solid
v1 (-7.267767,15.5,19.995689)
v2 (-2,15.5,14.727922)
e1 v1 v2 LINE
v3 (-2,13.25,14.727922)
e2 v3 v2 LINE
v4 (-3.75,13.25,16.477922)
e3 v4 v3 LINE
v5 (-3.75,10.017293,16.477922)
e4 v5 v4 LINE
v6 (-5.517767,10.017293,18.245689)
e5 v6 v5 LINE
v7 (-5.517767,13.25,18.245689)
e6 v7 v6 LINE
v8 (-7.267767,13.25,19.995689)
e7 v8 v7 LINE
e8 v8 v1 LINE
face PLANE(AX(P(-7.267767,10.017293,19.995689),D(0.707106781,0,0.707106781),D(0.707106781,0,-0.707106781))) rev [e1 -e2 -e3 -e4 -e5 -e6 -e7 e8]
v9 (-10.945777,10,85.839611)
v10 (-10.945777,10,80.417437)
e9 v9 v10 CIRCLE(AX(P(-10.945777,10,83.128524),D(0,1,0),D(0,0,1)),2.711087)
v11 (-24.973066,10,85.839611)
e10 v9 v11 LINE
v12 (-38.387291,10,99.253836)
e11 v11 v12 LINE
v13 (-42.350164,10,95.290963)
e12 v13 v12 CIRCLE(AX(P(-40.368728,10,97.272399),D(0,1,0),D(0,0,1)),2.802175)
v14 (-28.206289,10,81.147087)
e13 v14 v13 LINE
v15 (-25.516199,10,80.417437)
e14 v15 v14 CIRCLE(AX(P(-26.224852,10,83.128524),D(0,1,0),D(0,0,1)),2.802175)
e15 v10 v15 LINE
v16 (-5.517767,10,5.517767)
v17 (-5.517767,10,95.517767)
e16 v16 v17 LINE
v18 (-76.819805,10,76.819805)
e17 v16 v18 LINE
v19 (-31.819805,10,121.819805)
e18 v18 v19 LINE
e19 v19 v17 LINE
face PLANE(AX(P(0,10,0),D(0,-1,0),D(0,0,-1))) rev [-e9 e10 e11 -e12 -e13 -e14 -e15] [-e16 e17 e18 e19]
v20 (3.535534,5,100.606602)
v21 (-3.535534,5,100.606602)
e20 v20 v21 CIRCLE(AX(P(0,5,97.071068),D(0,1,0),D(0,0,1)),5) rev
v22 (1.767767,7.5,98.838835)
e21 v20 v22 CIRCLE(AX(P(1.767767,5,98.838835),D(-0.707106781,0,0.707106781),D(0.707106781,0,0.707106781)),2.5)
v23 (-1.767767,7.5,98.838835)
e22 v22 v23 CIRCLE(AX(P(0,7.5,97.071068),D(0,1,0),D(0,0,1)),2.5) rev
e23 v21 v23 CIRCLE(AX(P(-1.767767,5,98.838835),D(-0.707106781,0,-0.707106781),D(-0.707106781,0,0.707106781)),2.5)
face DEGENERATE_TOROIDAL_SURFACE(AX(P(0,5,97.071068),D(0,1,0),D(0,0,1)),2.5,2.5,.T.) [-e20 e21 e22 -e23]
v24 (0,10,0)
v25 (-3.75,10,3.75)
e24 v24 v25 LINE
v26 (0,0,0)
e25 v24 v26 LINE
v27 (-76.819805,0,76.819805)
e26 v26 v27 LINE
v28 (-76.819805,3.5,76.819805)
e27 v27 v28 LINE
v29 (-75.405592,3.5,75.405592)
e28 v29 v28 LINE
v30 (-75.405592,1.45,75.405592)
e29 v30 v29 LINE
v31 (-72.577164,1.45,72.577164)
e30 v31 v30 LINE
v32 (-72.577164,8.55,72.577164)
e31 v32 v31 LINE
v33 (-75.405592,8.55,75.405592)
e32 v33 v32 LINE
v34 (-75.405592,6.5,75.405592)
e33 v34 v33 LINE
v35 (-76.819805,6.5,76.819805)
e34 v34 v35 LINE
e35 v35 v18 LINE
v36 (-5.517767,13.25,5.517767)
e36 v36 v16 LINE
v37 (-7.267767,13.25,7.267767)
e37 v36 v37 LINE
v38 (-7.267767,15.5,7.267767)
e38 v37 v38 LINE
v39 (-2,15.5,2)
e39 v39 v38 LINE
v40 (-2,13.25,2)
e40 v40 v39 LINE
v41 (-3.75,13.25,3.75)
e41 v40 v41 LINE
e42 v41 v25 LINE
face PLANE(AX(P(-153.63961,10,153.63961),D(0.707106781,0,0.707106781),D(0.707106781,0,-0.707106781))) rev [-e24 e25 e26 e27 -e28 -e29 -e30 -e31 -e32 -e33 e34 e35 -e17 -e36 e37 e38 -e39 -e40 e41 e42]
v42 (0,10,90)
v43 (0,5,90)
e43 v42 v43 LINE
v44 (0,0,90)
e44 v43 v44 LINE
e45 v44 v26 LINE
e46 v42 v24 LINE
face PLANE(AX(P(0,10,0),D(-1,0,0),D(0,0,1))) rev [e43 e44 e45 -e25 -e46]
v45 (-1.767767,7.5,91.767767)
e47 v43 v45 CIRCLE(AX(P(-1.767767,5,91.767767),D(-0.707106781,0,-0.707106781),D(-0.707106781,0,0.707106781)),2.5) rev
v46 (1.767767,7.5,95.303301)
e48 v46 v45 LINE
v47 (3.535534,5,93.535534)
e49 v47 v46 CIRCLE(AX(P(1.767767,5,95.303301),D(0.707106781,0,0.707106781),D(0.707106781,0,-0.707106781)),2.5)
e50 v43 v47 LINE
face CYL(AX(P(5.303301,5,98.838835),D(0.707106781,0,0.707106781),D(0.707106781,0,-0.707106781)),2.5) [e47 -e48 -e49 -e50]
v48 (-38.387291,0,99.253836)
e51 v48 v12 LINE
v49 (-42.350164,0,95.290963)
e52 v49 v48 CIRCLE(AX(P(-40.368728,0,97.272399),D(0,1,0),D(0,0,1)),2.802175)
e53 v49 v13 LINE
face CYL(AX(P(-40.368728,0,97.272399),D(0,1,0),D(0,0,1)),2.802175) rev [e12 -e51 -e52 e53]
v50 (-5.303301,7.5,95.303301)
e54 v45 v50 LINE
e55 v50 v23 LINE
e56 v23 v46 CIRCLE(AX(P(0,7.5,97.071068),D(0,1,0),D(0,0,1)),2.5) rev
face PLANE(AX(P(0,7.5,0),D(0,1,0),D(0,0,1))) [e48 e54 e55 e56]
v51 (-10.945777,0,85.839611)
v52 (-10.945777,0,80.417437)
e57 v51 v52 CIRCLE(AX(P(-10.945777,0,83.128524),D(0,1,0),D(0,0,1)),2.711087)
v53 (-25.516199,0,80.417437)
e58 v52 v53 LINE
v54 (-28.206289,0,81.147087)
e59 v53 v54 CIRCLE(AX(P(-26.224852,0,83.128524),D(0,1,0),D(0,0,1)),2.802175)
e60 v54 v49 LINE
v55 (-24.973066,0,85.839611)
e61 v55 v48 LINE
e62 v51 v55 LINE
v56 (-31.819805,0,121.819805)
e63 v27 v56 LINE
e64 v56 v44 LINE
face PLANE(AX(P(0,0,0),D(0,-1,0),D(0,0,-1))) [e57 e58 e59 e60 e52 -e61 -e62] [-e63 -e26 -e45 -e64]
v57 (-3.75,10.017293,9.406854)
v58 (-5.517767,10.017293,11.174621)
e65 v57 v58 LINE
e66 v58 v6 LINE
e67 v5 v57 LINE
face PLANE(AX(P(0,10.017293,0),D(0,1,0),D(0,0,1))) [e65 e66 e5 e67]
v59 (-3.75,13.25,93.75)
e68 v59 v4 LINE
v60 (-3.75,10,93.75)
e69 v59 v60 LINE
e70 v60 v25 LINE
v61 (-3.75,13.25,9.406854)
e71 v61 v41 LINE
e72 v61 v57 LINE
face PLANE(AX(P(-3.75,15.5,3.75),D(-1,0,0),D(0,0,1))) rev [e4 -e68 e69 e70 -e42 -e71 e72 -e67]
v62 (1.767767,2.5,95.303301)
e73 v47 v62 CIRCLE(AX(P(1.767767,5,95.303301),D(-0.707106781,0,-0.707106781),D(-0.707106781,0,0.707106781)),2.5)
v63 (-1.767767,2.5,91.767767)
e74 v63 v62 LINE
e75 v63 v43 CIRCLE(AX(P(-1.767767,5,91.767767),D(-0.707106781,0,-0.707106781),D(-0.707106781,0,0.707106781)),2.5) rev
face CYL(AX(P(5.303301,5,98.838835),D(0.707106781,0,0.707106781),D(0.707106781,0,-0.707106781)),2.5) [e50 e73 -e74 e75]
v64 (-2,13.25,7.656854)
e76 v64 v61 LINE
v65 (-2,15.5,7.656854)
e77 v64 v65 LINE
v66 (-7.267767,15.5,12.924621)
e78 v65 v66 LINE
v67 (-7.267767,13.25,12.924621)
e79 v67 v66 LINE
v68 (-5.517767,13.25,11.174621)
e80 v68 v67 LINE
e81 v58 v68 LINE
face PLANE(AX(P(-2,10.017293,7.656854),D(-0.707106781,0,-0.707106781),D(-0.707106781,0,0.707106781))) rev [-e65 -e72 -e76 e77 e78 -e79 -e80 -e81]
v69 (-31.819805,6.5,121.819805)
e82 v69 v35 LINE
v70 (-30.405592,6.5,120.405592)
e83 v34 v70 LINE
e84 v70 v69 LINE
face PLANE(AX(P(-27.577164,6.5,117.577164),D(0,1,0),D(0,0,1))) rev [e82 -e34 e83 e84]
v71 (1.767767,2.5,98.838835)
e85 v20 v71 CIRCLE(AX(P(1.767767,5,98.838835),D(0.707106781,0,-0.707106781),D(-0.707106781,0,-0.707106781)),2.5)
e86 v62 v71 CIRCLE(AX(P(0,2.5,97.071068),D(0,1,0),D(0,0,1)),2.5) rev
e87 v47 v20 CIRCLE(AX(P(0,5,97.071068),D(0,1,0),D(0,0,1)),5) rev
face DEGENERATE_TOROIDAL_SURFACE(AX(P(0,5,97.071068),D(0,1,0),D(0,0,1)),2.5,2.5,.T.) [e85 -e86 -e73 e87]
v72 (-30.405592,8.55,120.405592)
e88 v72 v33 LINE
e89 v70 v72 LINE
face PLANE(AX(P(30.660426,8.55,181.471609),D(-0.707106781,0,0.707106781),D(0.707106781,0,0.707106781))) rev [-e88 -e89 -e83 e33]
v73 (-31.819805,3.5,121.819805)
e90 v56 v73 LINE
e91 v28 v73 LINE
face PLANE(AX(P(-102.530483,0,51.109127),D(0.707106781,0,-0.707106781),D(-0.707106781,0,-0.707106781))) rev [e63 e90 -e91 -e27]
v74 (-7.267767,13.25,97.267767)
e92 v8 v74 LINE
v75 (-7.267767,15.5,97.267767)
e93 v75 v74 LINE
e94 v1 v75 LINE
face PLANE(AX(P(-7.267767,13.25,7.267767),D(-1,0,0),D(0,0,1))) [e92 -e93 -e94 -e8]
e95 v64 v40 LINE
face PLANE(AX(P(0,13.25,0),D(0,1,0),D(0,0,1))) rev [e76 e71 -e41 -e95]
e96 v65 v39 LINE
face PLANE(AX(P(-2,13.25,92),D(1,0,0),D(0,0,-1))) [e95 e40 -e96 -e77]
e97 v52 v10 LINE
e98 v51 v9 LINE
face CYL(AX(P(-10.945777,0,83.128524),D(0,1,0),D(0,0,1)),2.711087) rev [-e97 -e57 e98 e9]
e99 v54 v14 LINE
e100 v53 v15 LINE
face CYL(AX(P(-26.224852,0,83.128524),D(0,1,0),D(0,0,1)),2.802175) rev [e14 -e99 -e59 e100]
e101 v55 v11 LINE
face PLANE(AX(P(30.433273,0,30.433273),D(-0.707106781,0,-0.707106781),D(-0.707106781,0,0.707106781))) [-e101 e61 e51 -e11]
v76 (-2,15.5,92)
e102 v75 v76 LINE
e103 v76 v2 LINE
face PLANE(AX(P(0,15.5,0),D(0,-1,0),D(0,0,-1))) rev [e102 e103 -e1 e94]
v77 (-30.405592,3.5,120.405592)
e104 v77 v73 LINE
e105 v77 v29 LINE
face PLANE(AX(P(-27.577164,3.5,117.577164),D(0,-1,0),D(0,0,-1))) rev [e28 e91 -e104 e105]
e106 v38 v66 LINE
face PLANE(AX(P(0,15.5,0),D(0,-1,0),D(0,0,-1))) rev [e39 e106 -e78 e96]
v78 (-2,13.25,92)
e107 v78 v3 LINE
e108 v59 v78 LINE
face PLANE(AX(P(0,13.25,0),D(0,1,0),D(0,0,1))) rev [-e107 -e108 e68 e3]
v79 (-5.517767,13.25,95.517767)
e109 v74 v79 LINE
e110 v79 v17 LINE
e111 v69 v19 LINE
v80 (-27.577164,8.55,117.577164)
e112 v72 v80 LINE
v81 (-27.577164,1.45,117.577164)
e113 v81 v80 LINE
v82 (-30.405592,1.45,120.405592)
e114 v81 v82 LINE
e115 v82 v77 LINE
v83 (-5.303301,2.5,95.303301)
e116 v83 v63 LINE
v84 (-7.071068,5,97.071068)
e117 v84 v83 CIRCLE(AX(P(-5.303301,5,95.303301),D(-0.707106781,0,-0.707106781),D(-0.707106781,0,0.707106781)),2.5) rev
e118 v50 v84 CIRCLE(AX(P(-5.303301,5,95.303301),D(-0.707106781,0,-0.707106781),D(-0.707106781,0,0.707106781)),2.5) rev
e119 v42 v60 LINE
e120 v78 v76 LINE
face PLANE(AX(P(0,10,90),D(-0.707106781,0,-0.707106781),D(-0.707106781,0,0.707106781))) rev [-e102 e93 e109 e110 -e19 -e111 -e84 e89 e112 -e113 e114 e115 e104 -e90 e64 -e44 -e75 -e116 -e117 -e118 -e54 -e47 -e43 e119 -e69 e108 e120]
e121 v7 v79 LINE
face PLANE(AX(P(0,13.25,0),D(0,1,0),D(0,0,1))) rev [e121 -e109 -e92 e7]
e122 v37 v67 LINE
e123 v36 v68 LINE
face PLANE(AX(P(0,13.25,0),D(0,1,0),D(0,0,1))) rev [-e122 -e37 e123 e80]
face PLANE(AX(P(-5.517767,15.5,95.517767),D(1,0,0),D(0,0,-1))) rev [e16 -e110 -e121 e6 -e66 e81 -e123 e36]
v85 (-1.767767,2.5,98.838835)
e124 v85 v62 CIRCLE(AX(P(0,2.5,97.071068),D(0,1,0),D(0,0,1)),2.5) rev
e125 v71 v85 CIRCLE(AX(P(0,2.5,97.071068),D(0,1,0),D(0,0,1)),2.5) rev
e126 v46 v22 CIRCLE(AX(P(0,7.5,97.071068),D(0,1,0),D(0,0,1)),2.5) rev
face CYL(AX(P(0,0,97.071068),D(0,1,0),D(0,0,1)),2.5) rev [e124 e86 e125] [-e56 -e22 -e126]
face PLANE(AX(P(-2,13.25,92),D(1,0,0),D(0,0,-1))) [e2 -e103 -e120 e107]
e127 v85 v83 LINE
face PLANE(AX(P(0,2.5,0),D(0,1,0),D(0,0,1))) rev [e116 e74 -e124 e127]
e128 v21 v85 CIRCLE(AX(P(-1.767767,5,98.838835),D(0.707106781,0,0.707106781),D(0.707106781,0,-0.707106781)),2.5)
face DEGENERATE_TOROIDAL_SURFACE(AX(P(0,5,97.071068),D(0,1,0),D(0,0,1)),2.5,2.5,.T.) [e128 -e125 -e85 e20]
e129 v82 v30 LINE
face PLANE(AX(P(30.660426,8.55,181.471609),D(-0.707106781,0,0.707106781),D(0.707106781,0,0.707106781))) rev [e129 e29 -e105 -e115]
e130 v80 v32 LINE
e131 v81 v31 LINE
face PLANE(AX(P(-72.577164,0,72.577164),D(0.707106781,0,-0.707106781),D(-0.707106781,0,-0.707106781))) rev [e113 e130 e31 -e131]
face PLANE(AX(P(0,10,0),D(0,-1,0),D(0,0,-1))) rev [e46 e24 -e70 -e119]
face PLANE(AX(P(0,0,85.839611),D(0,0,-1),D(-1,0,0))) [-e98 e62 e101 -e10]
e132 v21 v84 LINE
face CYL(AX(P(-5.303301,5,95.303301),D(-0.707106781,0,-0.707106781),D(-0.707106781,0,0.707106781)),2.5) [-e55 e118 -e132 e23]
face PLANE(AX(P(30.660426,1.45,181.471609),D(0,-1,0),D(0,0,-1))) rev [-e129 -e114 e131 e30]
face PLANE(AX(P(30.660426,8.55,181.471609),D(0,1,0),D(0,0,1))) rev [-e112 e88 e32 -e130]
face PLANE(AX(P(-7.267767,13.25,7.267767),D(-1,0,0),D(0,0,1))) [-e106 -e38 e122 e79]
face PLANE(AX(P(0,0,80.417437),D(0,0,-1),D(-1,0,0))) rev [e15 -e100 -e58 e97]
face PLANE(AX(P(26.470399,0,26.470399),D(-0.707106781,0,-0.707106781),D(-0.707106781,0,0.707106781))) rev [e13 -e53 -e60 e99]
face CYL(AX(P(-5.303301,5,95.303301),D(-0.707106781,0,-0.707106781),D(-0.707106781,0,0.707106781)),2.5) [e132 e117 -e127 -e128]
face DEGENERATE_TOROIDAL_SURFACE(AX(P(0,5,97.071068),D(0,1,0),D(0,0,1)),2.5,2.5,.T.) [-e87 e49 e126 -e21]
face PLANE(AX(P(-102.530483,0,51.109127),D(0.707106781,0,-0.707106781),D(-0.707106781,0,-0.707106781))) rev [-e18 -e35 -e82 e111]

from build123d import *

# Parameters (mm, degrees)
BOSS_EXTRUDE1_DEPTH = 10
BOSS_EXTRUDE2_DEPTH = 5.5
BOSS_EXTRUDE4_DEPTH = 2.25
SKETCH5_W           = 167.071716414
SKETCH5_H           = 54.025930679
CUT_EXTRUDE1_DEPTH  = 100
BOSS_EXTRUDE5_DEPTH = 5.5
BOSS_EXTRUDE6_DEPTH = 2.25
CUT_EXTRUDE2_DEPTH  = 2.25
CUT_EXTRUDE3_DEPTH  = 5.5
CUT_EXTRUDE4_DEPTH  = 5.5
CUT_EXTRUDE5_DEPTH  = 5.5
CUT_EXTRUDE6_DEPTH  = 5.5
SKETCH14_W          = 63.639610307
SKETCH14_H          = 3
CUT_EXTRUDE7_DEPTH  = 6
SKETCH15_W          = 4
SKETCH15_H          = 7.1
CUT_EXTRUDE8_DEPTH  = 150
SKETCH16_W          = 18.586901627
SKETCH16_H          = 5.5
CUT_EXTRUDE9_DEPTH  = 34
SKETCH17_W          = 2.5
SKETCH17_H          = 5.5
CUT_EXTRUDE10_DEPTH = 34
SKETCH18_W          = 1.498020702
SKETCH18_H          = 5.5
CUT_EXTRUDE11_DEPTH = 34
SKETCH19_W          = 3.248020701
SKETCH19_H          = 2.25
CUT_EXTRUDE12_DEPTH = 34
BOSS_EXTRUDE7_DEPTH = 10
SKETCH21_R          = 2.5
CUT_EXTRUDE13_DEPTH = 10
FILLET1_R           = 5
FILLET2_R           = 5
CUT_EXTRUDE14_DEPTH = 2.5
CUT_EXTRUDE15_DEPTH = 2.5
FILLET6_R           = 2.5
FILLET7_R           = 2.5
CUT_EXTRUDE16_DEPTH = 10
CUT_EXTRUDE17_DEPTH = 5.482707377


with BuildPart() as part:
    # Sketch1 → Boss-Extrude1 (new body)
    with BuildSketch(Plane(origin=(0, 0, 0), x_dir=(1, 0, 0), z_dir=(0, 1, 0))):
        Polygon((0, 0), (0, -90), (-63.639610307, -153.639610307), (-153.639610307, -153.639610307), align=None)
    extrude(amount=BOSS_EXTRUDE1_DEPTH)

    # Sketch3 → Boss-Extrude2 (add)
    with BuildSketch(Plane(origin=(0, 10, 0), x_dir=(1, 0, 0), z_dir=(0, 1, 0))):
        Polygon((-3.75, -3.75), (-3.75, -93.75), (-5.517766953, -95.517766953), (-5.517766953, -5.517766953), align=None)
    extrude(amount=BOSS_EXTRUDE2_DEPTH)

    # Sketch4 → Boss-Extrude4 (add)
    with BuildSketch(Plane(origin=(0, 15.5, 0), x_dir=(1, 0, 0), z_dir=(0, 1, 0))):
        Polygon((-3.75, -93.75), (-2, -92), (-2, -2), (-7.267766953, -7.267766953), (-7.267766953, -97.267766953), align=None)
    extrude(amount=-BOSS_EXTRUDE4_DEPTH)

    # Sketch5 → Cut-Extrude1 (cut)
    with BuildSketch(Plane(origin=(45, 0, 45), x_dir=(0.7071067811865487, 0, -0.7071067811865464), z_dir=(0.7071067811865464, 0, 0.7071067811865487))):
        with Locations((-192.175468514, 27.01296534)):
            Rectangle(SKETCH5_W, SKETCH5_H)
    extrude(amount=-CUT_EXTRUDE1_DEPTH, mode=Mode.SUBTRACT)

    # Sketch6 → Boss-Extrude5 (add)
    with BuildSketch(Plane(origin=(0, 10, 0), x_dir=(1, 0, 0), z_dir=(0, 1, 0))):
        Polygon((-7.267766953, -97.267766953), (-27.267766953, -97.267766953), (-41.819805153, -111.819805153), (-43.587572106, -110.0520382), (-28.303300859, -94.767766953), (-7.267766953, -94.767766953), align=None)
    extrude(amount=BOSS_EXTRUDE5_DEPTH)

    # Sketch7 → Boss-Extrude6 (add)
    with BuildSketch(Plane(origin=(0, 15.5, 0), x_dir=(1, 0, 0), z_dir=(0, 1, 0))):
        Polygon((-7.267766953, -94.767766953), (-7.267766953, -93.017766953), (-29.028174593, -93.017766953), (-44.822087786, -108.811680146), (-40.579447099, -113.054320833), (-26.542893219, -99.017766953), (-7.267766953, -99.017766953), align=None)
    extrude(amount=-BOSS_EXTRUDE6_DEPTH)

    # Sketch8 → Cut-Extrude2 (cut)
    with BuildSketch(Plane(origin=(0, 15.5, 0), x_dir=(1, 0, 0), z_dir=(0, 1, 0))):
        Polygon((-7.267766953, -97.267766953), (-9.017766953, -99.017766953), (-6.756511784, -101.279022122), (-4.757663026, -99.017766953), align=None)
    extrude(amount=-CUT_EXTRUDE2_DEPTH, mode=Mode.SUBTRACT)

    # Sketch9 → Cut-Extrude3 (cut)
    with BuildSketch(Plane(origin=(0, 15.5, 0), x_dir=(1, 0, 0), z_dir=(0, 1, 0))):
        Polygon((-29.028174593, -93.017766953), (-26.542893219, -99.017766953), (-24.410661726, -99.017766953), (-18.410661726, -93.017766953), align=None)
    extrude(amount=-CUT_EXTRUDE3_DEPTH, mode=Mode.SUBTRACT)

    # Sketch10 → Cut-Extrude4 (cut)
    with BuildSketch(Plane(origin=(0, 15.5, 0), x_dir=(1, 0, 0), z_dir=(0, 1, 0))):
        Polygon((-26.542893219, -99.017766953), (-28.439849815, -100.914723549), (-36.92513119, -100.914723549), (-29.028174593, -93.017766953), align=None)
    extrude(amount=-CUT_EXTRUDE4_DEPTH, mode=Mode.SUBTRACT)

    # Sketch11 → Cut-Extrude5 (cut)
    with BuildSketch(Plane(origin=(0, 15.5, 0), x_dir=(1, 0, 0), z_dir=(0, 1, 0))):
        Polygon((-23.159902577, -99.017766953), (-17.159902577, -93.017766953), (-18.410661726, -93.017766953), (-24.410661726, -99.017766953), align=None)
    extrude(amount=-CUT_EXTRUDE5_DEPTH, mode=Mode.SUBTRACT)

    # Sketch13 → Cut-Extrude6 (cut)
    with BuildSketch(Plane(origin=(0, 15.5, 0), x_dir=(1, 0, 0), z_dir=(0, 1, 0))):
        Polygon((-7.267766953, -93.017766953), (-7.267766953, -97.267766953), (-7.267766953, -100.891740466), (-9.284719157, -100.891740466), (-9.284719157, -93.017766953), align=None)
    extrude(amount=-CUT_EXTRUDE6_DEPTH, mode=Mode.SUBTRACT)

    # Sketch14 → Cut-Extrude7 (cut)
    with BuildSketch(Plane(origin=(-76.819805153, 0, 76.819805153), x_dir=(0.7071067811865465, 0, 0.7071067811865487), z_dir=(-0.7071067811865487, 0, 0.7071067811865465))):
        with Locations((31.819805154, 5)):
            Rectangle(SKETCH14_W, SKETCH14_H)
    extrude(amount=-CUT_EXTRUDE7_DEPTH, mode=Mode.SUBTRACT)

    # Sketch15 → Cut-Extrude8 (cut)
    with BuildSketch(Plane(origin=(0, 0, 0), x_dir=(-0.7071067811865434, 0, 0.7071067811865517), z_dir=(-0.7071067811865517, 0, -0.7071067811865434))):
        with Locations((104.639610307, 5)):
            Rectangle(SKETCH15_W, SKETCH15_H)
    extrude(amount=-CUT_EXTRUDE8_DEPTH, mode=Mode.SUBTRACT)

    # Sketch16 → Cut-Extrude9 (cut)
    with BuildSketch(Plane(origin=(-76.816883966, 0, 76.816883966), x_dir=(0.7071067811865475, 0, 0.7071067811865477), z_dir=(-0.7071067811865477, 0, 0.7071067811865475))):
        with Locations((54.540925497, 12.75)):
            Rectangle(SKETCH16_W, SKETCH16_H)
    extrude(amount=-CUT_EXTRUDE9_DEPTH, mode=Mode.SUBTRACT)

    # Sketch17 → Cut-Extrude10 (cut)
    with BuildSketch(Plane(origin=(-76.819805153, 0, 76.819805153), x_dir=(0.7071067811865465, 0, 0.7071067811865487), z_dir=(-0.7071067811865487, 0, 0.7071067811865465))):
        with Locations((48.247474683, 12.75)):
            Rectangle(SKETCH17_W, SKETCH17_H)
    extrude(amount=-CUT_EXTRUDE10_DEPTH, mode=Mode.SUBTRACT)

    # Sketch18 → Cut-Extrude11 (cut)
    with BuildSketch(Plane(origin=(-9.284719157, 0, 0), x_dir=(0, 0, -1), z_dir=(1, 0, 0))):
        with Locations((-95.516777304, 12.75)):
            Rectangle(SKETCH18_W, SKETCH18_H)
    extrude(amount=-CUT_EXTRUDE11_DEPTH, mode=Mode.SUBTRACT)


with BuildPart() as cut_extrude11_piece_1:
    # of the separate pieces the step leaves, piece 1, a body of its own (cut_extrude11_pieces)
    add(part.part.solids().sort_by_distance((0, 0, 0))[0])

    # Sketch20 → Boss-Extrude7 (add)
    with BuildSketch(Plane(origin=(0, 10, 0), x_dir=(1, 0, 0), z_dir=(0, 1, 0))):
        Polygon((0, -90), (-7.071067812, -97.071067812), (0, -104.142135624), (7.071067812, -97.071067812), align=None)
    extrude(amount=-BOSS_EXTRUDE7_DEPTH)

    # Sketch21 → Cut-Extrude13 (cut)
    with BuildSketch(Plane(origin=(0, 10, 0), x_dir=(1, 0, 0), z_dir=(0, 1, 0))):
        with Locations(Location((0, -97.071067812, 0), (0, 0, 270))):
            Circle(SKETCH21_R)
    extrude(amount=-CUT_EXTRUDE13_DEPTH, mode=Mode.SUBTRACT)

    # Fillet1
    fillet1_edges = [cut_extrude11_piece_1.edges().sort_by_distance(p)[0] for p in [
        (7.071067812, 5, 97.071067812),
    ]]
    fillet(fillet1_edges, radius=FILLET1_R)

    # Fillet2
    fillet2_edges = [cut_extrude11_piece_1.edges().sort_by_distance(p)[0] for p in [
        (0, 5, 104.142135624),
    ]]
    fillet(fillet2_edges, radius=FILLET2_R - 0.0001)  # a hair under: the kernel refuses the full size

    # Sketch22 → Cut-Extrude14 (cut)
    with BuildSketch(Plane(origin=(0, 10, 0), x_dir=(1, 0, 0), z_dir=(0, 1, 0))):
        Polygon((0, -90), (-7.071067812, -97.071067812), (5.303300859, -109.445436483), (12.374368671, -102.374368671), align=None)
    extrude(amount=-CUT_EXTRUDE14_DEPTH, mode=Mode.SUBTRACT)

    # Sketch23 → Cut-Extrude15 (cut)
    with BuildSketch(Plane(origin=(0, 0, 0), x_dir=(-1, 0, 0), z_dir=(0, -1, 0))):
        Polygon((0, -90), (7.071067812, -97.071067812), (-2.948055245, -107.090190869), (-10.019123057, -100.019123057), align=None)
    extrude(amount=-CUT_EXTRUDE15_DEPTH, mode=Mode.SUBTRACT)

    # Fillet6
    fillet6_edges = [cut_extrude11_piece_1.edges().sort_by_distance(p)[0] for p in [
        (-5.303265504, 7.5, 98.83887012),
        (1.767766953, 7.5, 91.767766953),
        (0, 7.5, 102.071109233),
    ]]
    fillet(fillet6_edges, radius=FILLET6_R - 0.0001)  # a hair under: the kernel refuses the full size

    # Fillet7
    fillet7_edges = [cut_extrude11_piece_1.edges().sort_by_distance(p)[0] for p in [
        (1.767766953, 2.5, 91.767766953),
        (-5.303265504, 2.5, 98.83887012),
        (0, 2.5, 102.071109233),
    ]]
    fillet(fillet7_edges, radius=FILLET7_R - 0.0001)  # a hair under: the kernel refuses the full size

    # Sketch24 → Cut-Extrude16 (cut)
    with BuildSketch(Plane(origin=(0, 10, 0), x_dir=(1, 0, 0), z_dir=(0, 1, 0))):
        with BuildLine():
            Line((-24.973066028, -85.839611094), (-10.945777457, -85.839611094))
            ThreePointArc((-10.945777457, -85.839611094), (-8.23469039, -83.128524027), (-10.945777457, -80.417436961))
            Line((-10.945777457, -80.417436961), (-25.516199237, -80.417436961))
            ThreePointArc((-25.516199237, -80.417436961), (-23.520394737, -82.394976475), (-24.243415571, -85.109960637))
            Line((-24.243415571, -85.109960637), (-24.973066028, -85.839611094))
        make_face()
        with BuildLine():
            Line((-38.387291027, -99.253836092), (-24.973066028, -85.839611094))
            Line((-24.973066028, -85.839611094), (-26.224852181, -85.839611094))
            ThreePointArc((-26.224852181, -85.839611094), (-28.935939248, -83.128524027), (-26.224852181, -80.417436961))
            Line((-26.224852181, -80.417436961), (-25.516199237, -80.417436961))
            ThreePointArc((-25.516199237, -80.417436961), (-26.958399734, -80.424066583), (-28.206288791, -81.147087417))
            Line((-28.206288791, -81.147087417), (-42.350164246, -95.290962873))
            ThreePointArc((-42.350164246, -95.290962873), (-42.350164246, -99.253836092), (-38.387291027, -99.253836092))
        make_face()
        with BuildLine():
            Line((-26.224852181, -85.839611094), (-24.973066028, -85.839611094))
            Line((-24.973066028, -85.839611094), (-24.243415571, -85.109960637))
            ThreePointArc((-24.243415571, -85.109960637), (-23.520394737, -82.394976475), (-25.516199237, -80.417436961))
            Line((-25.516199237, -80.417436961), (-26.224852181, -80.417436961))
            ThreePointArc((-26.224852181, -80.417436961), (-28.935939248, -83.128524027), (-26.224852181, -85.839611094))
        make_face()
    extrude(amount=-CUT_EXTRUDE16_DEPTH, mode=Mode.SUBTRACT)

    # Sketch25 → Cut-Extrude17 (cut)
    with BuildSketch(Plane(origin=(0, 15.5, 0), x_dir=(1, 0, 0), z_dir=(0, 1, 0))):
        Polygon((-2, -7.656854249), (-7.267766953, -12.924621202), (-7.267766953, -19.995689014), (-2, -14.727922061), align=None)
    extrude(amount=-CUT_EXTRUDE17_DEPTH, mode=Mode.SUBTRACT)


with BuildPart() as cut_extrude11_piece_2:
    # of the separate pieces the step leaves, piece 2, a body of its own (cut_extrude11_pieces)
    add(part.part.solids().sort_by_distance((-10.782739858, 13.25, 94.767766953))[0])

    # Sketch19 → Cut-Extrude12 (cut)
    with BuildSketch(Plane(origin=(0, 0, 93.017766953), x_dir=(-1, 0, 0), z_dir=(0, 0, -1))):
        with Locations((10.908729508, 14.375)):
            Rectangle(SKETCH19_W, SKETCH19_H)
    extrude(amount=-CUT_EXTRUDE12_DEPTH, mode=Mode.SUBTRACT)


solid = cut_extrude11_piece_1.part
